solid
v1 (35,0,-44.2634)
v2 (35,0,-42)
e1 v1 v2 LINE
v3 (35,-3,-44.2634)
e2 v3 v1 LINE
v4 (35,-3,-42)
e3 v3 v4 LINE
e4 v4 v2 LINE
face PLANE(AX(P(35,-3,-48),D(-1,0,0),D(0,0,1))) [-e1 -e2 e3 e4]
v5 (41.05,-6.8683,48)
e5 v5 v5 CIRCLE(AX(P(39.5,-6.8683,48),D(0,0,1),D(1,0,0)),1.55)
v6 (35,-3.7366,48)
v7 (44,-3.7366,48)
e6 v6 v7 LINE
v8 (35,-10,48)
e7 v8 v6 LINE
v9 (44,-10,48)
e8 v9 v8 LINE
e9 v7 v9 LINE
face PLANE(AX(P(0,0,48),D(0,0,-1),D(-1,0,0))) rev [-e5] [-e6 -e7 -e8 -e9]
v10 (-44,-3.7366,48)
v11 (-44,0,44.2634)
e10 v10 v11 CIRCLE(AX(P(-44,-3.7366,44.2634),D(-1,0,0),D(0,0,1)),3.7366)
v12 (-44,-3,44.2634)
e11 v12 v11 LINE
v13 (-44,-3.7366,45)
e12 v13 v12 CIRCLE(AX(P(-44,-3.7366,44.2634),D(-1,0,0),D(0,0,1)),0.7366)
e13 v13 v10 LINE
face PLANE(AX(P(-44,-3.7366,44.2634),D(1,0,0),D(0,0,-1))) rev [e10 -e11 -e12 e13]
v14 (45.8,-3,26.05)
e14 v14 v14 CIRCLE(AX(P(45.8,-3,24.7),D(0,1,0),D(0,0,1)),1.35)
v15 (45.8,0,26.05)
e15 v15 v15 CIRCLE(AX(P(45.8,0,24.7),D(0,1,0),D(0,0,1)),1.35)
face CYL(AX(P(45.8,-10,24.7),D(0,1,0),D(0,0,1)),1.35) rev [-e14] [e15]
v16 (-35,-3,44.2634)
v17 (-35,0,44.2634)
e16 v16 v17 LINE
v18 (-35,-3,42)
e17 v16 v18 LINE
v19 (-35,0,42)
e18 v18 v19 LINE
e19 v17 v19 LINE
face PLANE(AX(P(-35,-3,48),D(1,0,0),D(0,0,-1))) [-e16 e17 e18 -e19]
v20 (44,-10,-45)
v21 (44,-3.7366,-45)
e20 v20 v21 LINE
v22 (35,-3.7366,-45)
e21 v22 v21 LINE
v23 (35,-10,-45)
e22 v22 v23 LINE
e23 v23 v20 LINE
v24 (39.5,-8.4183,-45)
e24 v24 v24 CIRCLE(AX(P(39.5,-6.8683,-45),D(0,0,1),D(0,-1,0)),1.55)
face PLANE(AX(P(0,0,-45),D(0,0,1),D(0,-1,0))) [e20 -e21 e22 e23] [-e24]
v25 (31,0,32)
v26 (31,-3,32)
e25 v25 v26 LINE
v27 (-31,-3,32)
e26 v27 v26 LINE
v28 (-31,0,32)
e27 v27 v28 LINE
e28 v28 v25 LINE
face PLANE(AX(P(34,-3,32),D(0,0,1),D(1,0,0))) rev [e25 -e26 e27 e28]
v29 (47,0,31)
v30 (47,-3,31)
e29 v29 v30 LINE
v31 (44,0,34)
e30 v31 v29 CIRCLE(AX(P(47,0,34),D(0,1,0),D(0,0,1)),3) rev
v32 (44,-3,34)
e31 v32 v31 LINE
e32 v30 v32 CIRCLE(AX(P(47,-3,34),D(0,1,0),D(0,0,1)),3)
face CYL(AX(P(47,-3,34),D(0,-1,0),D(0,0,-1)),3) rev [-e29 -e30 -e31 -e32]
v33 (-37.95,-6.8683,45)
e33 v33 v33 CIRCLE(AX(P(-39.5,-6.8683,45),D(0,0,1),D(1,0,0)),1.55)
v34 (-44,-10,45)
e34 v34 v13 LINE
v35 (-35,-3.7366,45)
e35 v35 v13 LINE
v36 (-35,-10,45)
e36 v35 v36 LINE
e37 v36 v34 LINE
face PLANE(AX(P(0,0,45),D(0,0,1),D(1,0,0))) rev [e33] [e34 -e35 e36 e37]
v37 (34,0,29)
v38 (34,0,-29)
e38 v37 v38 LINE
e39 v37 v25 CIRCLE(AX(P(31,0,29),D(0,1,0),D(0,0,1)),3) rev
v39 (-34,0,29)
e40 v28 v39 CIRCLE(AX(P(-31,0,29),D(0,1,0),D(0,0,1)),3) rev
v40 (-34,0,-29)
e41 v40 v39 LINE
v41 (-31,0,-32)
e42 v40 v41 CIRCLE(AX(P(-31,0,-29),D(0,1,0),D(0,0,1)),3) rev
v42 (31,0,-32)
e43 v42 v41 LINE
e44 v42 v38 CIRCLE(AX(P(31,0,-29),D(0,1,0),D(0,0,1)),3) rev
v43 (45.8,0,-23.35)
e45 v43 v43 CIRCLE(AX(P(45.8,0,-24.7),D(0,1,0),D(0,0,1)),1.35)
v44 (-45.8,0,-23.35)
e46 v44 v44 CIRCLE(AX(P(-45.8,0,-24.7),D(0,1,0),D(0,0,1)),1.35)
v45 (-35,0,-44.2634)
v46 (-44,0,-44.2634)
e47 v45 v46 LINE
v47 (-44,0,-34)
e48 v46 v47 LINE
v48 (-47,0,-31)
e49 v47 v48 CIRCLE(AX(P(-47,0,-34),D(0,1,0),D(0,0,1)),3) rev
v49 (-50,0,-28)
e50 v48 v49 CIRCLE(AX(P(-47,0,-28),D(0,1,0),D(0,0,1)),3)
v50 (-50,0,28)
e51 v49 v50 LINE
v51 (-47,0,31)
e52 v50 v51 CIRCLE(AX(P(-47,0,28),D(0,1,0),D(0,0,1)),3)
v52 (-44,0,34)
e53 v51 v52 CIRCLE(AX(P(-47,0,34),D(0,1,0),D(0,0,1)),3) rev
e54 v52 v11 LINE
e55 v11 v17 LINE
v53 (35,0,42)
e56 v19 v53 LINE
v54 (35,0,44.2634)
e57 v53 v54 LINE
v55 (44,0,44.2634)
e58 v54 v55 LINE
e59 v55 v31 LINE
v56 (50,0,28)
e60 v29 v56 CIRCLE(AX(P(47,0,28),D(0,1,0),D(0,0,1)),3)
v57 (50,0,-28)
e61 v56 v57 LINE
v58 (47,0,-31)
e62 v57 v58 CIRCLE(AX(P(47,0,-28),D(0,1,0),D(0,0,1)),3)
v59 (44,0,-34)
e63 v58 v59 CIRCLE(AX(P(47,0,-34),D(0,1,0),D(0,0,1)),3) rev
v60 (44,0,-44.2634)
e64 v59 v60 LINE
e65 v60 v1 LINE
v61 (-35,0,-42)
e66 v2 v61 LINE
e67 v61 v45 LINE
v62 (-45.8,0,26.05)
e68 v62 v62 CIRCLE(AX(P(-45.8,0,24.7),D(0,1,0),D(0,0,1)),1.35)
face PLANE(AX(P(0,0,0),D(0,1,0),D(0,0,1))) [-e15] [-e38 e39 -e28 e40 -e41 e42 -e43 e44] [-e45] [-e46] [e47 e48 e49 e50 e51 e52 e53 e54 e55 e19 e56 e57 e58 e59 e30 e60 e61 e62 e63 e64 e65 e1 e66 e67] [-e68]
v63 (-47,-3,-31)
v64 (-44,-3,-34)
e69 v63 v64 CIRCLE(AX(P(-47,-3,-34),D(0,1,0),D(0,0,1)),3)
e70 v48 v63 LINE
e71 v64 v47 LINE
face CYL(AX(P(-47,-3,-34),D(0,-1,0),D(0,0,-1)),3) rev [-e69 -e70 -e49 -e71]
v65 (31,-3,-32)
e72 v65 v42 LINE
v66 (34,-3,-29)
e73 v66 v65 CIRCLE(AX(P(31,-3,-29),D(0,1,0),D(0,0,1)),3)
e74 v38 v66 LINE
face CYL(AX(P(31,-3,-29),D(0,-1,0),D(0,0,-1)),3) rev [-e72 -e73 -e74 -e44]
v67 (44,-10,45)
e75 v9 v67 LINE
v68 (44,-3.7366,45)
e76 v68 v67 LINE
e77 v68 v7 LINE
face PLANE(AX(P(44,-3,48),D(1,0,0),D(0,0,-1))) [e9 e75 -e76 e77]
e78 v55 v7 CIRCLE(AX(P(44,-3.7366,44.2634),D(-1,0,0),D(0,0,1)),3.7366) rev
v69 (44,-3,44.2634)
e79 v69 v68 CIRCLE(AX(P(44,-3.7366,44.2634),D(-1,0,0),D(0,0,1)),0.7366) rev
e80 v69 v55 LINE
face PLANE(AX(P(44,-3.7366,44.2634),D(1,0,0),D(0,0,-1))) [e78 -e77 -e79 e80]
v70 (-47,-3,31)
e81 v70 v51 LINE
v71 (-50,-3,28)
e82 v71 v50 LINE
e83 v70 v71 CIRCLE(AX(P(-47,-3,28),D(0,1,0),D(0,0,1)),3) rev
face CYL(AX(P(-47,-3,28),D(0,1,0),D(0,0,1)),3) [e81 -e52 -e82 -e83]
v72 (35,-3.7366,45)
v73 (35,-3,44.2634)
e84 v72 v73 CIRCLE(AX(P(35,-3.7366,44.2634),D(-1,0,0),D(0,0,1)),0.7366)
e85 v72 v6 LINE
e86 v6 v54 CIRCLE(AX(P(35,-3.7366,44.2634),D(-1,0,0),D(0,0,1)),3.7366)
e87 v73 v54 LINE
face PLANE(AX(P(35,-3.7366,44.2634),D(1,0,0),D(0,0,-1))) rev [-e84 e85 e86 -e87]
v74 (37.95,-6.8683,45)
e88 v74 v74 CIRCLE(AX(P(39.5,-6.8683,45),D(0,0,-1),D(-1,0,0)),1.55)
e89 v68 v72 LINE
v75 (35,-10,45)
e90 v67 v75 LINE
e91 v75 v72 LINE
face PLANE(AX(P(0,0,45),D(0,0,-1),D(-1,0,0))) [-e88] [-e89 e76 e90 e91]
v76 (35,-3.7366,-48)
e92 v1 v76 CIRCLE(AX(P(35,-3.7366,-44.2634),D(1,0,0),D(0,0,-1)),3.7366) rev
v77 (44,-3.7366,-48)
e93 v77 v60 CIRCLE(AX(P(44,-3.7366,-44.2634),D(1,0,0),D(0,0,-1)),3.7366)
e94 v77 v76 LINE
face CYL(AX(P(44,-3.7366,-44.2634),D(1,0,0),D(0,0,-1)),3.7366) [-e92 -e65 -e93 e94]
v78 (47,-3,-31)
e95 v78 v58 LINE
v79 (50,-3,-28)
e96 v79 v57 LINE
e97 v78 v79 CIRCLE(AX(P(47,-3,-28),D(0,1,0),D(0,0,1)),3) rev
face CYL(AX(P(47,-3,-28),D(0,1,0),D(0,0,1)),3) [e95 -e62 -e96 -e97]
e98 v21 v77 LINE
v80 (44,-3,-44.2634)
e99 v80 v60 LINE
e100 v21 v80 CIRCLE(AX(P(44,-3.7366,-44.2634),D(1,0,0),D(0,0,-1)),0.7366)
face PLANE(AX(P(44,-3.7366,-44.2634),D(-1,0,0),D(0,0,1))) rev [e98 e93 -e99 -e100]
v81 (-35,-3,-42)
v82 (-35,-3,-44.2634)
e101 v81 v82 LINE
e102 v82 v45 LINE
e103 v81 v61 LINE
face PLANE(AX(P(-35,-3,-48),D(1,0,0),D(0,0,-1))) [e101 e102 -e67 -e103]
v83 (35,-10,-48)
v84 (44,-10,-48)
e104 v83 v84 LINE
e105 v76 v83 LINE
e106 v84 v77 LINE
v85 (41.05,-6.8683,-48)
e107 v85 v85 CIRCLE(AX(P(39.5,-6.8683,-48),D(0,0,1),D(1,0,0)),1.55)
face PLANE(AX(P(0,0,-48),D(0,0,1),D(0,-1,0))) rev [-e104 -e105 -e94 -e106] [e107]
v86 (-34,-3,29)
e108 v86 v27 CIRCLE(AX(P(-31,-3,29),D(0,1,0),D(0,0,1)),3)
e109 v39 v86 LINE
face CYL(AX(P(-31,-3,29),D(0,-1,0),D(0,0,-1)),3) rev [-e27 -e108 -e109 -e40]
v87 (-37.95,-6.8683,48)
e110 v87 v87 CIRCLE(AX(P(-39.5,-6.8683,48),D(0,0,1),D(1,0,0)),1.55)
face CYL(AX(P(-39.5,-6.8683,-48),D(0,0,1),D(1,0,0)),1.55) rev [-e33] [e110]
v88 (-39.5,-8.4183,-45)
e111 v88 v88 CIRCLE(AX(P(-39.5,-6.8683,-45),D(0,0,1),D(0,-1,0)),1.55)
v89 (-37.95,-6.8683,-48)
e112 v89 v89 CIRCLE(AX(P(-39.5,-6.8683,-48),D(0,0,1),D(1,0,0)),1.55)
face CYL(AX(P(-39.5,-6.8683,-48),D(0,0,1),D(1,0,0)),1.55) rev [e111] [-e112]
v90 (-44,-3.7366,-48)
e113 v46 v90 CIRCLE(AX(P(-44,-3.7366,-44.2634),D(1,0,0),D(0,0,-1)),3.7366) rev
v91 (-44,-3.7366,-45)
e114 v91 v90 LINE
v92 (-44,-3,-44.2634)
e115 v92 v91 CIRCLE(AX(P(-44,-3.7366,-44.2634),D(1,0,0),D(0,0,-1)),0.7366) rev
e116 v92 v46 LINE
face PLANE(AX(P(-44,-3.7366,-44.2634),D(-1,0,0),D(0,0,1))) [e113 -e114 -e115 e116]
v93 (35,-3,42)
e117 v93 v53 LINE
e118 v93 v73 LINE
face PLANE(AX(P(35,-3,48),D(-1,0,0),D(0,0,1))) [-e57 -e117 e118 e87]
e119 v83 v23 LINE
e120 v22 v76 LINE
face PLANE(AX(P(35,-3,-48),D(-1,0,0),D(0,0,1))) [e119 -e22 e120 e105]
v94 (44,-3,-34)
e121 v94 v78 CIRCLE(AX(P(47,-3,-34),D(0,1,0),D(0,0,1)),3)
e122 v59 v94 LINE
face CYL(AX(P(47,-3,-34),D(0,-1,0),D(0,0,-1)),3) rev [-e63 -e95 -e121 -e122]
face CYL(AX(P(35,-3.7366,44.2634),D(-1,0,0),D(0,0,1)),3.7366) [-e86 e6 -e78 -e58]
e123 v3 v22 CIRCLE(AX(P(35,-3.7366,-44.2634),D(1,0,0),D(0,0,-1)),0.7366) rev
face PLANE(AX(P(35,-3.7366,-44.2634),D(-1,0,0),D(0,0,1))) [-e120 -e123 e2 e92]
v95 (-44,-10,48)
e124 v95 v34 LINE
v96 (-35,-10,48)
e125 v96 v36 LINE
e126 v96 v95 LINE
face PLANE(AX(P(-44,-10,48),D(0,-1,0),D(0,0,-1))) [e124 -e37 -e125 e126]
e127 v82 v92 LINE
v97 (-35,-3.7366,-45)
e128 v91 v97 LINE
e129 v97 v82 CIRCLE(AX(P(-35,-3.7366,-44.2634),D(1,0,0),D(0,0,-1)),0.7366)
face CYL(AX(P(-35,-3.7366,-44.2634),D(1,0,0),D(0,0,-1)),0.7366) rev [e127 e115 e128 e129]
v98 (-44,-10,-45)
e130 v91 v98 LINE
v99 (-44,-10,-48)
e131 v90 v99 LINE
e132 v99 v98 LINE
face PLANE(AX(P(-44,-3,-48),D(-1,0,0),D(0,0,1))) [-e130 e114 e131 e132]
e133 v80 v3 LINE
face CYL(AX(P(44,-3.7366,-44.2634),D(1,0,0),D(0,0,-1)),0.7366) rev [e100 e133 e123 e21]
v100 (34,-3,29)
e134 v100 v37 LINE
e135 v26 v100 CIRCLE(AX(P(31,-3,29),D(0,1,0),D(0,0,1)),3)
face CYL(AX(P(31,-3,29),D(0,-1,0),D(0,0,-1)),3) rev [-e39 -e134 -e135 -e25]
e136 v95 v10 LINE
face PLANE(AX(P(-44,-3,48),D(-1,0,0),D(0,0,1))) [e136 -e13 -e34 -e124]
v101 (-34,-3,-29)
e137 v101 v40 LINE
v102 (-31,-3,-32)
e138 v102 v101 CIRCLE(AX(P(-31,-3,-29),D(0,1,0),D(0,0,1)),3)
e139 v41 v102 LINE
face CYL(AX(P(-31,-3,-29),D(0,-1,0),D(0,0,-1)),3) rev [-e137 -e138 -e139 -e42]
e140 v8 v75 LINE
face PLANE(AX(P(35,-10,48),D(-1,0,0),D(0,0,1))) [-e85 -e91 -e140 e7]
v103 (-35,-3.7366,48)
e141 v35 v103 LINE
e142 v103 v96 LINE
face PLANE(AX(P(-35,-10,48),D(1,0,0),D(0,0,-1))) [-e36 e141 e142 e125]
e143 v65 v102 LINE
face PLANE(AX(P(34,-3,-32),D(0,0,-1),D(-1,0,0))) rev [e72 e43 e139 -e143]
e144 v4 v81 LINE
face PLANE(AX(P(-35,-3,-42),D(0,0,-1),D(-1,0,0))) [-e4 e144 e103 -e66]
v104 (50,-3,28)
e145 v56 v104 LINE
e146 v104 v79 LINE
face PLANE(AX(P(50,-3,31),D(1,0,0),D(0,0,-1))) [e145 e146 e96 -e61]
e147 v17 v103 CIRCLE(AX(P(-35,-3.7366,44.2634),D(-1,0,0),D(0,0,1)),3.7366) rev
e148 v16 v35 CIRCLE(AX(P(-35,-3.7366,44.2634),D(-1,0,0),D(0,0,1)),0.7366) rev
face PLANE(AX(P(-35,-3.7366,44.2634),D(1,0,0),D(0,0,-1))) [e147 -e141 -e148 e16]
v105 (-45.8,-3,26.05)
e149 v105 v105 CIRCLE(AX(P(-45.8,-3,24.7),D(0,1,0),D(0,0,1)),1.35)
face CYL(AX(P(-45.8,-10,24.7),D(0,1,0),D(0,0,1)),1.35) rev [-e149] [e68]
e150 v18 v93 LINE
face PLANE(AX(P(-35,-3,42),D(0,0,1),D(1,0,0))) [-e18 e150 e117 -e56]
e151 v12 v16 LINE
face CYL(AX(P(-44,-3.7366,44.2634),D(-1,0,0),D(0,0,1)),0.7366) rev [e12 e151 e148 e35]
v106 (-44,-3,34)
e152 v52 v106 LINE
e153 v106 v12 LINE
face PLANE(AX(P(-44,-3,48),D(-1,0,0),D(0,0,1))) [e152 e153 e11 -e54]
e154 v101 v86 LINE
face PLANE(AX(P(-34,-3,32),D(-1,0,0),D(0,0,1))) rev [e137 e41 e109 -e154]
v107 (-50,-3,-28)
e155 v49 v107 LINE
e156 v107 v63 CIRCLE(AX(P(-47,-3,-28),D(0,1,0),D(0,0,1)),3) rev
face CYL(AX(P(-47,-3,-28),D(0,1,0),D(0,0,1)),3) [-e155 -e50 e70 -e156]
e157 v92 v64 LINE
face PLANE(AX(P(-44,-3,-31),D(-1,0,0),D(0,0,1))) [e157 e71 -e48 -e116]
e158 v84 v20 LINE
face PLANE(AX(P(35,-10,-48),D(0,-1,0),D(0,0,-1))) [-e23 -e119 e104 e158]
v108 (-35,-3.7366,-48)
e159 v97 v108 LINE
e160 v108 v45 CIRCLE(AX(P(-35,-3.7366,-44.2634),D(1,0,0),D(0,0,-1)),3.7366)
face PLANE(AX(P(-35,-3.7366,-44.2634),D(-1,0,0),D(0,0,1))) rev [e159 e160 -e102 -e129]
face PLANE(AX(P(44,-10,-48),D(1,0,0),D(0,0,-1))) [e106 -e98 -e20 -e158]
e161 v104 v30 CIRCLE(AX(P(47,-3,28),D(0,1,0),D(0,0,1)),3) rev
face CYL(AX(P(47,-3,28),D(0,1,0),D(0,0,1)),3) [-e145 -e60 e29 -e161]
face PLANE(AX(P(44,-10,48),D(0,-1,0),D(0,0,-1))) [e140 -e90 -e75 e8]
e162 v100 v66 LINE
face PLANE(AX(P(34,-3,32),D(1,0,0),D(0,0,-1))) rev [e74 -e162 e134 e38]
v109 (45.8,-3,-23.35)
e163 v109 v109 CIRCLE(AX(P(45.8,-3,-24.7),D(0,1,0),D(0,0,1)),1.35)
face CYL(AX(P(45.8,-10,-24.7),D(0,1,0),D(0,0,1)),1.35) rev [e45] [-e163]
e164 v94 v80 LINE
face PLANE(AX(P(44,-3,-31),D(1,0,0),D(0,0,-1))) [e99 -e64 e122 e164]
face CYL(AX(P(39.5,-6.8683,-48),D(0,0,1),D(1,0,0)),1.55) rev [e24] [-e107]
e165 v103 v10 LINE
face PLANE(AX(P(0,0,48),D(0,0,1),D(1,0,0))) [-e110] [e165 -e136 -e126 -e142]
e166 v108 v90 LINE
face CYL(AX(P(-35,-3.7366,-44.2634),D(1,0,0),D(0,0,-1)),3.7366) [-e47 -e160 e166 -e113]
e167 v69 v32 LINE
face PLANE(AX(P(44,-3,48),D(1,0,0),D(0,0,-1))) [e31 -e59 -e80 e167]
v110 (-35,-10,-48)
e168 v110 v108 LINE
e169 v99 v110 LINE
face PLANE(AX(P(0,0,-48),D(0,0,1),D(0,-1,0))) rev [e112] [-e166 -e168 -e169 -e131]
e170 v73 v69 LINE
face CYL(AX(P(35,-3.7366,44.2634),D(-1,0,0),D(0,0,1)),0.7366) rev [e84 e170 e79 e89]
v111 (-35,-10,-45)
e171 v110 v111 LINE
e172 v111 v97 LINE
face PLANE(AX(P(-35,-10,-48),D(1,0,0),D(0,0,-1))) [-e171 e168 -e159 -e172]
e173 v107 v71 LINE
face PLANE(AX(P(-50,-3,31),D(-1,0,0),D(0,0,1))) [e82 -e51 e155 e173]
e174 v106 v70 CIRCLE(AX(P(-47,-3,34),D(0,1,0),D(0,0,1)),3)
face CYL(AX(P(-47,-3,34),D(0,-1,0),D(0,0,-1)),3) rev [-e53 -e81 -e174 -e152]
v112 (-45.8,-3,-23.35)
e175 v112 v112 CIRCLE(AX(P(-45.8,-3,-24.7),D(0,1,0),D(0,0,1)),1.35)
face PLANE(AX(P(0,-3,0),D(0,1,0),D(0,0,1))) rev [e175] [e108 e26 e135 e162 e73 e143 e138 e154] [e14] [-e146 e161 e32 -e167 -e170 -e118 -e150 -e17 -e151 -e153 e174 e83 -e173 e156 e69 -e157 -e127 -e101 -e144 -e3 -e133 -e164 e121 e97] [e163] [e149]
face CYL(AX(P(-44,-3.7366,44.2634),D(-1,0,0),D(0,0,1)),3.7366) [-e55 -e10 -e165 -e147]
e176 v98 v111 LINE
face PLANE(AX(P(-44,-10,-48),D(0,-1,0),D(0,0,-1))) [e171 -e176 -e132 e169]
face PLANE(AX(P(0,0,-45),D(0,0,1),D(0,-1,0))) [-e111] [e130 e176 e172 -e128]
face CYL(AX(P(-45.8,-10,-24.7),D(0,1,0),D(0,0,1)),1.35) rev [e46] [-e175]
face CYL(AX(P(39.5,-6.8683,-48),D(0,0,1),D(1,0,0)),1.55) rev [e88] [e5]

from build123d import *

# Parameters (mm, degrees)
SKETCH3_W                      = 68
SKETCH3_H                      = 64
BASE_FLANGE1_DEPTH             = 3
EDGE_FLANGE1_STRIP_W           = 13.4732
EDGE_FLANGE1_STRIP_H           = 3
EDGE_FLANGE1_STRIP_CUT_DEPTH   = 9
EDGE_FLANGE1_STRIP_2_W         = 13.4732
EDGE_FLANGE1_STRIP_2_H         = 3
EDGE_FLANGE1_STRIP_CUT_2_DEPTH = 9
EDGE_FLANGE1_STRIP_3_W         = 13.4732
EDGE_FLANGE1_STRIP_3_H         = 3
EDGE_FLANGE1_STRIP_CUT_3_DEPTH = 9
EDGE_FLANGE1_STRIP_4_W         = 13.4732
EDGE_FLANGE1_STRIP_4_H         = 3
EDGE_FLANGE1_STRIP_CUT_4_DEPTH = 9
EDGE_FLANGE1_DEPTH             = 9
EDGE_FLANGE1_BEND_DEPTH        = 9
EDGE_FLANGE1_BEND_2_DEPTH      = 9
EDGE_FLANGE1_BEND_3_DEPTH      = 9
FILLET1_R                      = 3
FILLET2_R                      = 3
SKETCH20_R                     = 1.55
CUT_EXTRUDE1_DEPTH             = 109.701425934
SKETCH22_R                     = 1.35
CUT_EXTRUDE2_DEPTH             = 71.0285656


# Sheet-metal steps are written as plain solids
with BuildPart() as part:
    # Sketch3 → Base-Flange1 (new body)
    with BuildSketch(Plane(origin=(0, 0, 0), x_dir=(1, 0, 0), z_dir=(0, 1, 0))):
        Polygon((50, 31), (44, 31), (44, 48), (35, 48), (35, 42), (-35, 42), (-35, 48), (-44, 48), (-44, 31), (-50, 31), (-50, -31), (-44, -31), (-44, -48), (-35, -48), (-35, -42), (35, -42), (35, -48), (44, -48), (44, -31), (50, -31), align=None)
        Rectangle(SKETCH3_W, SKETCH3_H, mode=Mode.SUBTRACT)
    extrude(amount=-BASE_FLANGE1_DEPTH)

    # Edge-Flange1 strip (across the edge) → Edge-Flange1 strip cut (cut)
    with BuildSketch(Plane(origin=(-35, -3, 48), x_dir=(0, 0, -1), z_dir=(-1, 0, 0))):
        with Locations((-3, -1.5)):
            Rectangle(EDGE_FLANGE1_STRIP_W, EDGE_FLANGE1_STRIP_H)
    extrude(amount=EDGE_FLANGE1_STRIP_CUT_DEPTH, mode=Mode.SUBTRACT)

    # Edge-Flange1 strip 2 (across the edge) → Edge-Flange1 strip cut 2 (cut)
    with BuildSketch(Plane(origin=(44, -3, 48), x_dir=(0, 0, -1), z_dir=(-1, 0, 0))):
        with Locations((-3, -1.5)):
            Rectangle(EDGE_FLANGE1_STRIP_2_W, EDGE_FLANGE1_STRIP_2_H)
    extrude(amount=EDGE_FLANGE1_STRIP_CUT_2_DEPTH, mode=Mode.SUBTRACT)

    # Edge-Flange1 strip 3 (across the edge) → Edge-Flange1 strip cut 3 (cut)
    with BuildSketch(Plane(origin=(35, -3, -48), x_dir=(0, 0, 1), z_dir=(1, 0, 0))):
        with Locations((-3, -1.5)):
            Rectangle(EDGE_FLANGE1_STRIP_3_W, EDGE_FLANGE1_STRIP_3_H)
    extrude(amount=EDGE_FLANGE1_STRIP_CUT_3_DEPTH, mode=Mode.SUBTRACT)

    # Edge-Flange1 strip 4 (across the edge) → Edge-Flange1 strip cut 4 (cut)
    with BuildSketch(Plane(origin=(-44, -3, -48), x_dir=(0, 0, 1), z_dir=(1, 0, 0))):
        with Locations((-3, -1.5)):
            Rectangle(EDGE_FLANGE1_STRIP_4_W, EDGE_FLANGE1_STRIP_4_H)
    extrude(amount=EDGE_FLANGE1_STRIP_CUT_4_DEPTH, mode=Mode.SUBTRACT)

    # Edge-Flange1 section (across the edge) → Edge-Flange1 (add)
    with BuildSketch(Plane(origin=(-35, -3, 48), x_dir=(0, 0, -1), z_dir=(-1, 0, 0))):
        with BuildLine():
            Line((0, 0.7366), (0, 7))
            Line((0, 7), (3, 7))
            Line((3, 7), (3, 0.7366))
            ThreePointArc((3, 0.7366), (3.215745145, 0.215745145), (3.7366, 0))
            Line((3.7366, 0), (3.7366, -3))
            ThreePointArc((3.7366, -3), (1.094424801, -1.905575199), (0, 0.7366))
        make_face()
    extrude(amount=EDGE_FLANGE1_DEPTH)

    # Edge-Flange1 section 2 (across the edge) → Edge-Flange1 bend (add)
    with BuildSketch(Plane(origin=(44, -3, 48), x_dir=(0, 0, -1), z_dir=(-1, 0, 0))):
        with BuildLine():
            Line((0, 0.7366), (0, 7))
            Line((0, 7), (3, 7))
            Line((3, 7), (3, 0.7366))
            ThreePointArc((3, 0.7366), (3.215745145, 0.215745145), (3.7366, 0))
            Line((3.7366, 0), (3.7366, -3))
            ThreePointArc((3.7366, -3), (1.094424801, -1.905575199), (0, 0.7366))
        make_face()
    extrude(amount=EDGE_FLANGE1_BEND_DEPTH)

    # Edge-Flange1 section 3 (across the edge) → Edge-Flange1 bend 2 (add)
    with BuildSketch(Plane(origin=(35, -3, -48), x_dir=(0, 0, 1), z_dir=(1, 0, 0))):
        with BuildLine():
            Line((0, 0.7366), (0, 7))
            Line((0, 7), (3, 7))
            Line((3, 7), (3, 0.7366))
            ThreePointArc((3, 0.7366), (3.215745145, 0.215745145), (3.7366, 0))
            Line((3.7366, 0), (3.7366, -3))
            ThreePointArc((3.7366, -3), (1.094424801, -1.905575199), (0, 0.7366))
        make_face()
    extrude(amount=EDGE_FLANGE1_BEND_2_DEPTH)

    # Edge-Flange1 section 4 (across the edge) → Edge-Flange1 bend 3 (add)
    with BuildSketch(Plane(origin=(-44, -3, -48), x_dir=(0, 0, 1), z_dir=(1, 0, 0))):
        with BuildLine():
            Line((0, 0.7366), (0, 7))
            Line((0, 7), (3, 7))
            Line((3, 7), (3, 0.7366))
            ThreePointArc((3, 0.7366), (3.215745145, 0.215745145), (3.7366, 0))
            Line((3.7366, 0), (3.7366, -3))
            ThreePointArc((3.7366, -3), (1.094424801, -1.905575199), (0, 0.7366))
        make_face()
    extrude(amount=EDGE_FLANGE1_BEND_3_DEPTH)

    # Fillet1
    fillet1_edges = [part.edges().sort_by_distance(p)[0] for p in [
        (44, -1.5, 31),
        (-44, -1.5, 31),
        (-44, -1.5, -31),
        (44, -1.5, -31),
        (-34, -1.5, 32),
        (-34, -1.5, -32),
        (34, -1.5, -32),
        (34, -1.5, 32),
    ]]
    fillet(fillet1_edges, radius=FILLET1_R)

    # Fillet2
    fillet2_edges = [part.edges().sort_by_distance(p)[0] for p in [
        (50, -1.5, -31),
        (50, -1.5, 31),
        (-50, -1.5, 31),
        (-50, -1.5, -31),
    ]]
    fillet(fillet2_edges, radius=FILLET2_R - 0.0001)  # a hair under: the kernel refuses the full size

    # Sketch20 → Cut-Extrude1 (cut, through all)
    with BuildSketch(Plane.XY.offset(48)):
        with Locations((-39.5, -6.8683)):
            Circle(SKETCH20_R)
        with Locations((39.5, -6.8683)):
            Circle(SKETCH20_R)
    extrude(amount=-CUT_EXTRUDE1_DEPTH, mode=Mode.SUBTRACT)

    # Sketch22 → Cut-Extrude2 (cut, through all)
    with BuildSketch(Plane(origin=(0, 0, 0), x_dir=(1, 0, 0), z_dir=(0, 1, 0))):
        with Locations(Location((-45.8, 24.7, 0), (0, 0, 270))):
            Circle(SKETCH22_R)
        with Locations(Location((-45.8, -24.7, 0), (0, 0, 270))):
            Circle(SKETCH22_R)
        with Locations(Location((45.8, 24.7, 0), (0, 0, 270))):
            Circle(SKETCH22_R)
        with Locations(Location((45.8, -24.7, 0), (0, 0, 270))):
            Circle(SKETCH22_R)
    extrude(amount=-CUT_EXTRUDE2_DEPTH, mode=Mode.SUBTRACT)


solid = part.part
